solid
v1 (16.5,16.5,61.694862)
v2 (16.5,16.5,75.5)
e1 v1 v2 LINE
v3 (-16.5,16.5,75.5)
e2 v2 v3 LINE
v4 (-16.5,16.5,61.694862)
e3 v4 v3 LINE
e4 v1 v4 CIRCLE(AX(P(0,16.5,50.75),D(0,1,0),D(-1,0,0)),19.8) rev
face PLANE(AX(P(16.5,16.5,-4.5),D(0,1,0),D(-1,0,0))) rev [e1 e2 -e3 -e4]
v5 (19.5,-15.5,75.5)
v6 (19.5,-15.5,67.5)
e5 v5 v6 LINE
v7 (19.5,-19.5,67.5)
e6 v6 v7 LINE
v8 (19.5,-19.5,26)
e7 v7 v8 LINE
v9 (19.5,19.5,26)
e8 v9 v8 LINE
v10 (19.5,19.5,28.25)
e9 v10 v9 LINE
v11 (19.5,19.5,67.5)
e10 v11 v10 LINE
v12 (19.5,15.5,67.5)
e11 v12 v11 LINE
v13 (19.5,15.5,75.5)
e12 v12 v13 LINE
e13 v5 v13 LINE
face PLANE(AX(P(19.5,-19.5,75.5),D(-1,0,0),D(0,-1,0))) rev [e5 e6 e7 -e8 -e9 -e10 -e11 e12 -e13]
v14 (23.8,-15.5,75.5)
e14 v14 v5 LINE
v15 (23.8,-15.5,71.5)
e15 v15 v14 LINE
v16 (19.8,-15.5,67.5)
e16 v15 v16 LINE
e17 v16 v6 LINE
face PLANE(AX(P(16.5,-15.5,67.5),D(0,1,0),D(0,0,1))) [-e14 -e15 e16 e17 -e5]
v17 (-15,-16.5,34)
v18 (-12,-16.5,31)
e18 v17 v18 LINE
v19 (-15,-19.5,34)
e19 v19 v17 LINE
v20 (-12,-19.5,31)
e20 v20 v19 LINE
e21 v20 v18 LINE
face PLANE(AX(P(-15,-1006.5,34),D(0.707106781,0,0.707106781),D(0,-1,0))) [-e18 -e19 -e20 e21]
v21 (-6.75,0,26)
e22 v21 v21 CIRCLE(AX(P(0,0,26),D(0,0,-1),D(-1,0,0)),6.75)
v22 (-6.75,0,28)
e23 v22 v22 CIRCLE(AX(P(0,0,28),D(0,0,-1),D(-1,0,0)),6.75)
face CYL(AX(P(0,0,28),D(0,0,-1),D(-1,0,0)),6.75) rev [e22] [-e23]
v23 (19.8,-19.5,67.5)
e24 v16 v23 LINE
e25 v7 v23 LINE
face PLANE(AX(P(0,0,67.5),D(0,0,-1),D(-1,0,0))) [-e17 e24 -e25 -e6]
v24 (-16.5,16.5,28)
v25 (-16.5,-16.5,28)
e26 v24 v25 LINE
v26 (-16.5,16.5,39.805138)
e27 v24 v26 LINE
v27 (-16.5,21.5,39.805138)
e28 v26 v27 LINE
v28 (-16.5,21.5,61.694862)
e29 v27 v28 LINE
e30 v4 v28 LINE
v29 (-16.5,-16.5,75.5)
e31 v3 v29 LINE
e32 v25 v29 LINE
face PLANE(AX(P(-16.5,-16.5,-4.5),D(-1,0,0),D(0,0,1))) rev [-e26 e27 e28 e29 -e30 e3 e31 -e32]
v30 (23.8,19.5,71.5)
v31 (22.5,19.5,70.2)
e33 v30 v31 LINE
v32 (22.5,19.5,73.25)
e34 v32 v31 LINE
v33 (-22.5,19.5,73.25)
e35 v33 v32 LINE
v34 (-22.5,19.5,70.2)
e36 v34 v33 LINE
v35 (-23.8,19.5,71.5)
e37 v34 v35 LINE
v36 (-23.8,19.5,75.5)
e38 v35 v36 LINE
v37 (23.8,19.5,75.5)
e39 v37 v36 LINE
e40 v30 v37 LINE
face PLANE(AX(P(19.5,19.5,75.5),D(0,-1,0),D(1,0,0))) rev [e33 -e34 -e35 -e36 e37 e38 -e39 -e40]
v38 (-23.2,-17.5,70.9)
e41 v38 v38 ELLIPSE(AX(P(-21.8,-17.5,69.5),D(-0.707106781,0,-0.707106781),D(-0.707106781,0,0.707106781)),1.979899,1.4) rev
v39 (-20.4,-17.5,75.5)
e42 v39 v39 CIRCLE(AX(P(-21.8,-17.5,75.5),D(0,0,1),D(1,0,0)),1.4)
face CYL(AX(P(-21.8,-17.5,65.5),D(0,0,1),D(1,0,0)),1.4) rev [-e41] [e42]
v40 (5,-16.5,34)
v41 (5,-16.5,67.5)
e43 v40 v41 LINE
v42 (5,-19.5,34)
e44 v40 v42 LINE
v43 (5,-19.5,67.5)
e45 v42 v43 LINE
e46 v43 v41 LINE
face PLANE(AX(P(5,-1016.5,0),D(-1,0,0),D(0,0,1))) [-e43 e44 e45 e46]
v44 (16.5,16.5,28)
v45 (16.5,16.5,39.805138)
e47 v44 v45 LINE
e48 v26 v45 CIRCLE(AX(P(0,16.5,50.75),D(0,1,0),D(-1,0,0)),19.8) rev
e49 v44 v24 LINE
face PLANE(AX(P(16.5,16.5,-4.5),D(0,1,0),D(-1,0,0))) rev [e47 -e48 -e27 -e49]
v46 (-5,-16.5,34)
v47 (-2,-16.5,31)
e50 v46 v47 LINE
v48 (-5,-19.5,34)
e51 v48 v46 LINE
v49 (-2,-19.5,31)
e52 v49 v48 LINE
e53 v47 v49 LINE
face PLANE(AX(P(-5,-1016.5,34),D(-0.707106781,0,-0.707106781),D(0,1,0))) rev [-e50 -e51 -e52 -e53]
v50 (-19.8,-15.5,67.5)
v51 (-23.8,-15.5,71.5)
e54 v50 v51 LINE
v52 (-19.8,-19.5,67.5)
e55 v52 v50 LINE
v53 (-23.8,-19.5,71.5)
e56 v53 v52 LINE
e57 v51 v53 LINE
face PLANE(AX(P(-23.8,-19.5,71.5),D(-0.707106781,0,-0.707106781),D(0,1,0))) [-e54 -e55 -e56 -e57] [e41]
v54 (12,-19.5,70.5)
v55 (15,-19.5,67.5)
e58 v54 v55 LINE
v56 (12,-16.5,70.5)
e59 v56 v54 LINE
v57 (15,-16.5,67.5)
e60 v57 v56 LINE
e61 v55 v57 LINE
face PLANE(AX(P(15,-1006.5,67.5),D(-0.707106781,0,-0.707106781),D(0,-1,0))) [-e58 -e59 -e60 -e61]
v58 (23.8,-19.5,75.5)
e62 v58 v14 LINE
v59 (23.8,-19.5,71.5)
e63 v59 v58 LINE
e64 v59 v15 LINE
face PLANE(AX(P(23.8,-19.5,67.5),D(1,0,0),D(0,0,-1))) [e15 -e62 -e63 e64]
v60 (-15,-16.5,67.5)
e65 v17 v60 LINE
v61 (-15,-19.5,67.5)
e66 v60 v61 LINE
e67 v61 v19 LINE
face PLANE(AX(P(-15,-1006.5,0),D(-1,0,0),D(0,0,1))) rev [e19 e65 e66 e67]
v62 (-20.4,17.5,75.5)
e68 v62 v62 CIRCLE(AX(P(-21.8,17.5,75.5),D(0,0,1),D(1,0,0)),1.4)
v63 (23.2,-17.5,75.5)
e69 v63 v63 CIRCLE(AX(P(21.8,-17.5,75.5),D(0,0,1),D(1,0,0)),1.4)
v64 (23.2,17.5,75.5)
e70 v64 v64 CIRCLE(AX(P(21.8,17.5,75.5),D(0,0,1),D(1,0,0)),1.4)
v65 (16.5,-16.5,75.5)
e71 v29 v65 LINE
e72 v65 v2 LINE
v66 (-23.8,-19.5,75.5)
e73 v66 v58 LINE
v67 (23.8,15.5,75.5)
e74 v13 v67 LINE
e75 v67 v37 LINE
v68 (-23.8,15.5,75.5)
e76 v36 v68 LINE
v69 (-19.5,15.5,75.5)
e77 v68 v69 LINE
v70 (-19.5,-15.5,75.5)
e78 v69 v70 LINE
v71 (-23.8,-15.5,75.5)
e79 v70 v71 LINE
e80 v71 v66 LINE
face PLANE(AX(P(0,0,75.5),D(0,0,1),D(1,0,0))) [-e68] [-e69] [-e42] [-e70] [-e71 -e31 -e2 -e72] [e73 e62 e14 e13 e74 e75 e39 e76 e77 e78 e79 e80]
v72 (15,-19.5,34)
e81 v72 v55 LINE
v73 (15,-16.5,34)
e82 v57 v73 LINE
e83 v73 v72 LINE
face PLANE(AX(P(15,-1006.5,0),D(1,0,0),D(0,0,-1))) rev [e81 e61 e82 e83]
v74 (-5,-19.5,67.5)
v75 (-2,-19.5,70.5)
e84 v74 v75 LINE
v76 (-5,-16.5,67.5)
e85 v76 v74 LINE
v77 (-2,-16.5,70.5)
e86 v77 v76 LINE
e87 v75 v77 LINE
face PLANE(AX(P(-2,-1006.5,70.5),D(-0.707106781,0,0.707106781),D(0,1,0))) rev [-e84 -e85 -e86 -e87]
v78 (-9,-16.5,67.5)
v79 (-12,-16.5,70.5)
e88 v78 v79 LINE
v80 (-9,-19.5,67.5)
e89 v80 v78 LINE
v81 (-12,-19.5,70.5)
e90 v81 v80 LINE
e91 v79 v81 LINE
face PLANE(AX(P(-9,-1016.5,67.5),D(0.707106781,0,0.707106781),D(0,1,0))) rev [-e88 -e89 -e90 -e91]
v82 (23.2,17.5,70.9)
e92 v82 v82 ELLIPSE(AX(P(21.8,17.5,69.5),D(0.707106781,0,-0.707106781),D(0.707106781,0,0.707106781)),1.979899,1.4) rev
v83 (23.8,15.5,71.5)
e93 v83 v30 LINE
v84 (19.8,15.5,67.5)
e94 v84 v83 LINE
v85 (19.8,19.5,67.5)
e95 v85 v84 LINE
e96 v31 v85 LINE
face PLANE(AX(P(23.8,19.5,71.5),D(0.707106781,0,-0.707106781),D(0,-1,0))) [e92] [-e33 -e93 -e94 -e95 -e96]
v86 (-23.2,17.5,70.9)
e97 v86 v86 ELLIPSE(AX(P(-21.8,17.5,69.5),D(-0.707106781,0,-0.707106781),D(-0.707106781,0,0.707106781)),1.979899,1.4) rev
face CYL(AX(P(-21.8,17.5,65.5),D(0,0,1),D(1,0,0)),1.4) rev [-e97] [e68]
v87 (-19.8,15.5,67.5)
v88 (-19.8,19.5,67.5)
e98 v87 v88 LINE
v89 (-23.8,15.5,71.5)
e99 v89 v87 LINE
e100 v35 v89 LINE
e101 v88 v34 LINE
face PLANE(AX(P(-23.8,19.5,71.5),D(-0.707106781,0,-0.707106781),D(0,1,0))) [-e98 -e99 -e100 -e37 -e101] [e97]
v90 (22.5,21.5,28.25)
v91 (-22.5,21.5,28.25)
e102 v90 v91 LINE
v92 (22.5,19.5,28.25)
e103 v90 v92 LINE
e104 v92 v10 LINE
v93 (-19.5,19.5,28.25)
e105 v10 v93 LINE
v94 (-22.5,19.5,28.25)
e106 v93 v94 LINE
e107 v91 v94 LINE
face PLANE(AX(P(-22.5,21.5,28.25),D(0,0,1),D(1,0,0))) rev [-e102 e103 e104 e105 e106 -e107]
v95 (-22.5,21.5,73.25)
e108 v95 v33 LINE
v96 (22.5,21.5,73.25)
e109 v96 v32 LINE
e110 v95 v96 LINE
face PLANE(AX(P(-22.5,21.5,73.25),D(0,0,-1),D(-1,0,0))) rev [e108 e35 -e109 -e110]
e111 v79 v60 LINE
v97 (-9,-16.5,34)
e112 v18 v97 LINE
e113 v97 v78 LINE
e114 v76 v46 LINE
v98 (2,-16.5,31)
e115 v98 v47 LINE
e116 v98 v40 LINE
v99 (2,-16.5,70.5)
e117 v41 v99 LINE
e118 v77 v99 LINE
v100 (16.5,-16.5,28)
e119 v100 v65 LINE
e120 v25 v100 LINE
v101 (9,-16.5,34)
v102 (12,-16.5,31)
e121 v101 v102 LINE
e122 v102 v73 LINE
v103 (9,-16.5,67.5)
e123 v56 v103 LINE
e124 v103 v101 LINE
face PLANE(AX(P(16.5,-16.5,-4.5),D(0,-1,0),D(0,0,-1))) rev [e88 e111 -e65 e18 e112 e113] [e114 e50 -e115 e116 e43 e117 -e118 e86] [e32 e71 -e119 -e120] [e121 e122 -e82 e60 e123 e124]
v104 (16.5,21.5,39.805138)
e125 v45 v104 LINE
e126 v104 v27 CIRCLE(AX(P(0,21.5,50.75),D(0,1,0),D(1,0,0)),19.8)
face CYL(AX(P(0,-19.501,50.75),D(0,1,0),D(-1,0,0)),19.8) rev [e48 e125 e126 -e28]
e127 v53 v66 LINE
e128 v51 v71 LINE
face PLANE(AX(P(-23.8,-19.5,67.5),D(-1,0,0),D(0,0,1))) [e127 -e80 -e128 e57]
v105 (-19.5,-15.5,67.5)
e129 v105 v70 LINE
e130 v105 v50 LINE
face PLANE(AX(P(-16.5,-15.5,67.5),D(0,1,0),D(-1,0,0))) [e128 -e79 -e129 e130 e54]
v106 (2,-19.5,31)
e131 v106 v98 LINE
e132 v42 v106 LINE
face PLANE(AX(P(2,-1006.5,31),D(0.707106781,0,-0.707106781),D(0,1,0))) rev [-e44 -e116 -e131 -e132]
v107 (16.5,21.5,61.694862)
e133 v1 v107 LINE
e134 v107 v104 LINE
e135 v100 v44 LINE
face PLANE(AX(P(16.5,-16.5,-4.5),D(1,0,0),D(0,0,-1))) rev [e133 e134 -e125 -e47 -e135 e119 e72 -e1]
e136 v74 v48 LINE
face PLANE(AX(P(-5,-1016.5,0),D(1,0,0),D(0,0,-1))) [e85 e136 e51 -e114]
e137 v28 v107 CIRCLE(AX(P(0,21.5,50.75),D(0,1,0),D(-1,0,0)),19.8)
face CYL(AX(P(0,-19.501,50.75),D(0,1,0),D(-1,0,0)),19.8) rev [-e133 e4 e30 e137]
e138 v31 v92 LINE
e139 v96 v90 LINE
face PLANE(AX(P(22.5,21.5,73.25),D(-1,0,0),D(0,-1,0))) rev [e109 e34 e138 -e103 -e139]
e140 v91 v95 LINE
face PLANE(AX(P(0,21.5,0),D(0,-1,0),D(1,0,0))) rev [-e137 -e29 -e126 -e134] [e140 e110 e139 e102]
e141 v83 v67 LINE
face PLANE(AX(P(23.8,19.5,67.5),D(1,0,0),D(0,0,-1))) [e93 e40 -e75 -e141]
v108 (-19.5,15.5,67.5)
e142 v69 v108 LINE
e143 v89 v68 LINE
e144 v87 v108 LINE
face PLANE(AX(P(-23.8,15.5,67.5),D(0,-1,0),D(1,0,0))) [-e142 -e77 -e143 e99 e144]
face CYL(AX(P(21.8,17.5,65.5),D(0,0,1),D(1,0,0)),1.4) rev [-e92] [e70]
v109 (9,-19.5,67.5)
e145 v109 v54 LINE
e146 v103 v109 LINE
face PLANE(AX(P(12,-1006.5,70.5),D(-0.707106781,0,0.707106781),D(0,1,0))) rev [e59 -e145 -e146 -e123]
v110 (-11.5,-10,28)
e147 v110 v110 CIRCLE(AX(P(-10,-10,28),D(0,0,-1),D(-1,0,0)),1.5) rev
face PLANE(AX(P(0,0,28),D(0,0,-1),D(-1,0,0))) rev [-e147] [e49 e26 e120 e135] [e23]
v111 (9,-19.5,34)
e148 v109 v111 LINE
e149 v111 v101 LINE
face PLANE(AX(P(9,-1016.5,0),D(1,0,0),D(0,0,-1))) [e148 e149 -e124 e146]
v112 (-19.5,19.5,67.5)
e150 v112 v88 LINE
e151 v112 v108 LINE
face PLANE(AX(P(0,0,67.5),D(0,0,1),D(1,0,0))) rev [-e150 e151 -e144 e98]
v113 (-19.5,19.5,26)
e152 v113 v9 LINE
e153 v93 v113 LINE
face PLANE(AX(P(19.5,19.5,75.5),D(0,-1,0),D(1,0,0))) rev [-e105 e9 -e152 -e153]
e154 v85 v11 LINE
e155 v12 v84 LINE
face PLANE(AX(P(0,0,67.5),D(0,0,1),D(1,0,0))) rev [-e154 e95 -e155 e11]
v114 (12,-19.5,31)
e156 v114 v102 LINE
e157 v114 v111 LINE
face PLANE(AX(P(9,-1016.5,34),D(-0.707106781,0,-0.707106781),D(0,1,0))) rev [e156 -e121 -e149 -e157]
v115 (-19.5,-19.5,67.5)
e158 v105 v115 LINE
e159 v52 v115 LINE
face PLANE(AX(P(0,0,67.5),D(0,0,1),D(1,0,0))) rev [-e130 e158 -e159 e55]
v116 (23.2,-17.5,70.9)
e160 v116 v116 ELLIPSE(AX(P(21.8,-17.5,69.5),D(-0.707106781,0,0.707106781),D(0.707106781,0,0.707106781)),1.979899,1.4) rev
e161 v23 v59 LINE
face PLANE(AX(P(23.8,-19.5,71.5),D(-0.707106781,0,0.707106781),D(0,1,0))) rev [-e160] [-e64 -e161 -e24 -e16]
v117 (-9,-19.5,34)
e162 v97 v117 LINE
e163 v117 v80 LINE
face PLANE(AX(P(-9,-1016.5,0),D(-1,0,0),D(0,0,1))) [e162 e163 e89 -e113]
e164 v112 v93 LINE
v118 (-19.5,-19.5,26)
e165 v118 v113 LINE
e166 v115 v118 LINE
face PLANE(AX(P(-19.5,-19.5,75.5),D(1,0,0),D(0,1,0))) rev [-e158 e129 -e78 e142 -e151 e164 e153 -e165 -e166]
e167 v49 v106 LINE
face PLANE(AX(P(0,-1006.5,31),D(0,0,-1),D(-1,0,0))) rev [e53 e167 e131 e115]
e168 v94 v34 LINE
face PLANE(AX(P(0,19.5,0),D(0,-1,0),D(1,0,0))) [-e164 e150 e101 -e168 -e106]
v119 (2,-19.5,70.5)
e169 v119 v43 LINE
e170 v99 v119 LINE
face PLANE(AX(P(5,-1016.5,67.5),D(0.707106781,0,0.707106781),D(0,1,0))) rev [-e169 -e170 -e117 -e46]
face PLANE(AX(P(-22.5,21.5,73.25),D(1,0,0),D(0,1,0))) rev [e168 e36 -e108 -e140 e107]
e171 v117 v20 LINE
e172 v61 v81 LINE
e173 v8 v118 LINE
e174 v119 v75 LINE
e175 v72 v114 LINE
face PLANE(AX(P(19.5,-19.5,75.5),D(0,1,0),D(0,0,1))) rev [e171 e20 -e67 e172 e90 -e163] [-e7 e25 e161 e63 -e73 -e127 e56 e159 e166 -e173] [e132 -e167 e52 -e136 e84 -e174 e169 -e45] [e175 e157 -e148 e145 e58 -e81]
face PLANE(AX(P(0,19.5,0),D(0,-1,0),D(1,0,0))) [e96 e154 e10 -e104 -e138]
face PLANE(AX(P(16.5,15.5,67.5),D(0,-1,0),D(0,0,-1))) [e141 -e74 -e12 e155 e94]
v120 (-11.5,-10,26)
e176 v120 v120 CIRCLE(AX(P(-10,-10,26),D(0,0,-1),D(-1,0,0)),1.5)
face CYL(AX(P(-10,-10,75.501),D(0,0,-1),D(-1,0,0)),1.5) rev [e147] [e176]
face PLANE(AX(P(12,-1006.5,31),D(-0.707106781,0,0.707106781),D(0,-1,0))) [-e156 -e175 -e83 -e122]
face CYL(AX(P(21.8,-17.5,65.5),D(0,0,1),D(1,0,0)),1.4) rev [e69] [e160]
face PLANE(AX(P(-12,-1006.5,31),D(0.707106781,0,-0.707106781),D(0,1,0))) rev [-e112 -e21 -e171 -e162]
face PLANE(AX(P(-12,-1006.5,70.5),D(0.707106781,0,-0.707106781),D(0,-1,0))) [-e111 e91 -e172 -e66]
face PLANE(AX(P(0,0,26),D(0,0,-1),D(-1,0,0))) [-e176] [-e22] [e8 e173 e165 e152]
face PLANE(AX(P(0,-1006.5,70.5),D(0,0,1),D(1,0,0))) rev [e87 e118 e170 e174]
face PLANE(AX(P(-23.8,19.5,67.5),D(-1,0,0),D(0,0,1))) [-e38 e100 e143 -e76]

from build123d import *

# Parameters (mm, degrees)
CROQUIS1_W               = 39
CROQUIS1_H               = 39
SALIENTE_EXTRUIR2_DEPTH  = 75.5
CROQUIS2_W               = 33
CROQUIS2_H               = 33
CORTAR_EXTRUIR1_DEPTH    = 80
CROQUIS11_W              = 33
CROQUIS11_H              = 33
SALIENTE_EXTRUIR3_DEPTH  = 37
CROQUIS13_W              = 33
CROQUIS13_H              = 33
CORTAR_EXTRUIR6_DEPTH    = 81.378790735
CROQUIS16_W              = 39
CROQUIS16_H              = 39
CORTAR_EXTRUIR8_DEPTH    = 10
CROQUIS19_W              = 20
CROQUIS19_H              = 20
SALIENTE_EXTRUIR4_DEPTH  = 3
CROQUIS33_W              = 39
CROQUIS33_H              = 39
SALIENTE_EXTRUIR7_DEPTH  = 18
CROQUIS35_W              = 39
CROQUIS35_H              = 39
CORTAR_EXTRUIR17_DEPTH   = 16
CROQUIS36_R              = 6.75
CORTAR_EXTRUIR18_DEPTH   = 2
CORTAR_EXTRUIR19_REACH   = 89.187
SALIENTE_EXTRUIR10_START = 2
CROQUIS38_W              = 45
CROQUIS38_H              = 45
SALIENTE_EXTRUIR10_DEPTH = 2
CROQUIS39_W              = 7.3
CROQUIS39_H              = 4
SALIENTE_EXTRUIR12_DEPTH = 8
RESPIRADERO1_START       = 31
RESPIRADERO1_OUTLINE_W   = 6
RESPIRADERO1_OUTLINE_H   = 3
RESPIRADERO1_OUTLINE_W_2 = 10
RESPIRADERO1_DEPTH       = 39.5
CHAFL_N7_SIZE            = 3
CROQUIS40_R              = 1.4
CORTAR_EXTRUIR20_DEPTH   = 10
CHAFL_N8_SIZE            = 4
CORTAR_EXTRUIR21_REACH   = 60.983
CROQUIS43_R              = 1.5


# Read off the part's stored shape, not the designer's step: Respiradero1
# Some blends are built 0.0001 mm under size
with BuildPart() as part:
    # Croquis1 → Saliente-Extruir2 (new body)
    with BuildSketch(Plane.XY):
        Rectangle(CROQUIS1_W, CROQUIS1_H)
    extrude(amount=SALIENTE_EXTRUIR2_DEPTH)

    # Croquis2 → Cortar-Extruir1 (cut)
    with BuildSketch(Plane.XY.offset(75.5)):
        Rectangle(CROQUIS2_W, CROQUIS2_H)
    extrude(amount=-CORTAR_EXTRUIR1_DEPTH, mode=Mode.SUBTRACT)

    # Croquis11 → Saliente-Extruir3 (add)
    with BuildSketch(Plane(origin=(0, 0, 0), x_dir=(-1, 0, 0), z_dir=(0, 0, -1))):
        Rectangle(CROQUIS11_W, CROQUIS11_H)
    extrude(amount=-SALIENTE_EXTRUIR3_DEPTH)

    # Croquis13 → Cortar-Extruir6 (cut, through all)
    with BuildSketch(Plane(origin=(0, 0, 0), x_dir=(-1, 0, 0), z_dir=(0, 0, -1))):
        Rectangle(CROQUIS13_W, CROQUIS13_H)
    extrude(amount=-CORTAR_EXTRUIR6_DEPTH, mode=Mode.SUBTRACT)

    # Croquis16 → Cortar-Extruir8 (cut)
    with BuildSketch(Plane(origin=(0, 0, 0), x_dir=(-1, 0, 0), z_dir=(0, 0, -1))):
        Rectangle(CROQUIS16_W, CROQUIS16_H)
    extrude(amount=-CORTAR_EXTRUIR8_DEPTH, mode=Mode.SUBTRACT)

    # Croquis19 → Saliente-Extruir4 (add)
    with BuildSketch(Plane(origin=(0, 19.5, 0), x_dir=(1, 0, 0), z_dir=(0, 1, 0))):
        with Locations((-2, -55.5)):
            Rectangle(CROQUIS19_W, CROQUIS19_H)
    extrude(amount=-SALIENTE_EXTRUIR4_DEPTH)

    # Croquis33 → Saliente-Extruir7 (add)
    with BuildSketch(Plane(origin=(0, 0, 10), x_dir=(-1, 0, 0), z_dir=(0, 0, -1))):
        Rectangle(CROQUIS33_W, CROQUIS33_H)
    extrude(amount=-SALIENTE_EXTRUIR7_DEPTH)

    # Croquis35 → Cortar-Extruir17 (cut)
    with BuildSketch(Plane(origin=(0, 0, 10), x_dir=(-1, 0, 0), z_dir=(0, 0, -1))):
        Rectangle(CROQUIS35_W, CROQUIS35_H)
    extrude(amount=-CORTAR_EXTRUIR17_DEPTH, mode=Mode.SUBTRACT)

    # Croquis36 → Cortar-Extruir18 (cut)
    with BuildSketch(Plane(origin=(0, 0, 26), x_dir=(-1, 0, 0), z_dir=(0, 0, -1))):
        Circle(CROQUIS36_R)
    extrude(amount=-CORTAR_EXTRUIR18_DEPTH, mode=Mode.SUBTRACT)

    # Croquis37 → Cortar-Extruir19 (cut, up to next)
    with BuildSketch(Plane(origin=(0, 19.5, 0), x_dir=(1, 0, 0), z_dir=(0, 1, 0)), mode=Mode.PRIVATE) as cortar_extruir19_sk1:
        with BuildLine():
            ThreePointArc((-5.8e-08, -30.95), (-6.484436966, -32.041924812), (-12.253670087, -35.19726489))
            Line((-12.253670087, -35.19726489), (12.253670087, -66.30273511))
            ThreePointArc((12.253670087, -66.30273511), (14.560271631, -64.167842228), (16.5, -61.694861808))
            Line((16.5, -61.694861808), (16.5, -39.805138192))
            ThreePointArc((16.5, -39.805138192), (9.363005266, -33.303678543), (-5.8e-08, -30.95))
        make_face()
    cortar_extruir19_tool1 = extrude(cortar_extruir19_sk1.sketch, amount=-CORTAR_EXTRUIR19_REACH, mode=Mode.PRIVATE) & part.part
    # Croquis37 → Cortar-Extruir19 (cut, up to next)
    with BuildSketch(Plane(origin=(0, 19.5, 0), x_dir=(1, 0, 0), z_dir=(0, 1, 0)), mode=Mode.PRIVATE) as cortar_extruir19_sk2:
        with BuildLine():
            Line((12.253670087, -66.30273511), (-12.253670087, -35.19726489))
            ThreePointArc((-12.253670087, -35.19726489), (-14.560271631, -37.332157772), (-16.5, -39.805138192))
            Line((-16.5, -39.805138192), (-16.5, -61.694861808))
            ThreePointArc((-16.5, -61.694861808), (-9.363005292, -68.196321443), (0, -70.55))
            ThreePointArc((0, -70.55), (6.484436939, -69.458075197), (12.253670087, -66.30273511))
        make_face()
    cortar_extruir19_tool2 = extrude(cortar_extruir19_sk2.sketch, amount=-CORTAR_EXTRUIR19_REACH, mode=Mode.PRIVATE) & part.part
    add(cortar_extruir19_tool1.solids().sort_by_distance((5.629579, 19.5, 45.099579))[0], mode=Mode.SUBTRACT)
    add(cortar_extruir19_tool2.solids().sort_by_distance((-5.629579, 19.5, 56.400421))[0], mode=Mode.SUBTRACT)

    # Croquis38 → Saliente-Extruir10 (add)
    with BuildSketch(Plane(origin=(0, 19.5, 0), x_dir=(1, 0, 0), z_dir=(0, 1, 0)).offset(SALIENTE_EXTRUIR10_START)):
        with Locations((0, -50.75)):
            Rectangle(CROQUIS38_W, CROQUIS38_H)
        with BuildLine():
            Line((-16.5, -39.805138192), (-16.5, -61.694861808))
            ThreePointArc((-16.5, -61.694861808), (0, -70.55), (16.5, -61.694861808))
            Line((16.5, -61.694861808), (16.5, -39.805138192))
            ThreePointArc((16.5, -39.805138192), (0, -30.95), (-16.5, -39.805138192))
        make_face(mode=Mode.SUBTRACT)
    extrude(amount=-SALIENTE_EXTRUIR10_DEPTH)

    # Croquis39 → Saliente-Extruir12 (add)
    with BuildSketch(Plane.XY.offset(75.5)):
        Polygon((-16.5, 16.5), (-16.5, 19.5), (-23.8, 19.5), (-23.8, 15.5), (-16.5, 15.5), align=None)
        with Locations((-20.15, -17.5)):
            Rectangle(CROQUIS39_W, CROQUIS39_H)
        with Locations((20.15, -17.5)):
            Rectangle(CROQUIS39_W, CROQUIS39_H)
        with Locations((20.15, 17.5)):
            Rectangle(CROQUIS39_W, CROQUIS39_H)
    extrude(amount=-SALIENTE_EXTRUIR12_DEPTH)

    # Respiradero1 outline → Respiradero1 (cut)
    with BuildSketch(Plane.XY.offset(RESPIRADERO1_START)):
        with Locations((-12, -18)):
            Rectangle(RESPIRADERO1_OUTLINE_W, RESPIRADERO1_OUTLINE_H)
        with Locations((0, -18)):
            Rectangle(RESPIRADERO1_OUTLINE_W_2, RESPIRADERO1_OUTLINE_H)
        with Locations((12, -18)):
            Rectangle(RESPIRADERO1_OUTLINE_W, RESPIRADERO1_OUTLINE_H)
    extrude(amount=RESPIRADERO1_DEPTH, mode=Mode.SUBTRACT)

    # Chaflán7
    chafl_n7_edges = [part.edges().sort_by_distance(p)[0] for p in [
        (15, -18, 70.5),
        (-15, -18, 70.5),
        (-15, -18, 31),
        (15, -18, 31),
        (5, -18, 31),
        (5, -18, 70.5),
        (9, -18, 70.5),
        (9, -18, 31),
        (-5, -18, 70.5),
        (-5, -18, 31),
        (-9, -18, 31),
        (-9, -18, 70.5),
    ]]
    chamfer(chafl_n7_edges, length=CHAFL_N7_SIZE - 0.0001)  # a hair under: the kernel refuses the full size

    # Croquis40 → Cortar-Extruir20 (cut)
    with BuildSketch(Plane.XY.offset(75.5)):
        with Locations((-21.8, 17.5)):
            Circle(CROQUIS40_R)
        with Locations((21.8, 17.5)):
            Circle(CROQUIS40_R)
        with Locations((21.8, -17.5)):
            Circle(CROQUIS40_R)
        with Locations((-21.8, -17.5)):
            Circle(CROQUIS40_R)
    extrude(amount=-CORTAR_EXTRUIR20_DEPTH, mode=Mode.SUBTRACT)

    # Chaflán8
    # the kernel refuses this chamfer: 4 mm, written as the material it takes off along each edge
    with BuildSketch(Plane(origin=(-23.8, 19.5, 67.5), x_dir=(-0.02749587661058651, 0, 0.9996219169112968), z_dir=(0, -1, 0)), Plane(origin=(23.8, 5.213268048, 67.5), x_dir=(0.02749587661058651, 0, 0.9996219169112968), z_dir=(0, 1, 0))) as chafl_n8_piece_1:
        Polygon((CHAFL_N8_SIZE * 0.999621916911, -CHAFL_N8_SIZE * 0.0274958766106), (-CHAFL_N8_SIZE * 0.0274958766106, -CHAFL_N8_SIZE * 0.999621916911), (0, 0), align=None)
    extrude(amount=14.286731952, mode=Mode.SUBTRACT)
    with BuildSketch(Plane(origin=(-23.8, -29.786731952, 67.5), x_dir=(-0.02749587661058651, 0, 0.9996219169112968), z_dir=(0, 1, 0))) as chafl_n8_piece_2:
        Polygon((CHAFL_N8_SIZE * 0.999621916911, CHAFL_N8_SIZE * 0.0274958766106), (-CHAFL_N8_SIZE * 0.0274958766106, CHAFL_N8_SIZE * 0.999621916911), (0, 0), align=None)
    extrude(amount=24.573463904, mode=Mode.SUBTRACT)
    with BuildSketch(Plane(origin=(23.8, -29.786731952, 67.5), x_dir=(0.02749587661058651, 0, 0.9996219169112968), z_dir=(0, 1, 0))) as chafl_n8_piece_3:
        Polygon((CHAFL_N8_SIZE * 0.999621916911, -CHAFL_N8_SIZE * 0.0274958766106), (-CHAFL_N8_SIZE * 0.0274958766106, -CHAFL_N8_SIZE * 0.999621916911), (0, 0), align=None)
    extrude(amount=24.573463904, mode=Mode.SUBTRACT)

    # Croquis43 → Cortar-Extruir21 (cut, up to next)
    with BuildSketch(Plane(origin=(0, 0, 26), x_dir=(-1, 0, 0), z_dir=(0, 0, -1)), mode=Mode.PRIVATE) as cortar_extruir21_sk1:
        with Locations((10, -10)):
            Circle(CROQUIS43_R)
    cortar_extruir21_tool1 = extrude(cortar_extruir21_sk1.sketch, amount=-CORTAR_EXTRUIR21_REACH, mode=Mode.PRIVATE) & part.part
    add(cortar_extruir21_tool1.solids().sort_by_distance((-10, -10, 26))[0], mode=Mode.SUBTRACT)


solid = part.part
